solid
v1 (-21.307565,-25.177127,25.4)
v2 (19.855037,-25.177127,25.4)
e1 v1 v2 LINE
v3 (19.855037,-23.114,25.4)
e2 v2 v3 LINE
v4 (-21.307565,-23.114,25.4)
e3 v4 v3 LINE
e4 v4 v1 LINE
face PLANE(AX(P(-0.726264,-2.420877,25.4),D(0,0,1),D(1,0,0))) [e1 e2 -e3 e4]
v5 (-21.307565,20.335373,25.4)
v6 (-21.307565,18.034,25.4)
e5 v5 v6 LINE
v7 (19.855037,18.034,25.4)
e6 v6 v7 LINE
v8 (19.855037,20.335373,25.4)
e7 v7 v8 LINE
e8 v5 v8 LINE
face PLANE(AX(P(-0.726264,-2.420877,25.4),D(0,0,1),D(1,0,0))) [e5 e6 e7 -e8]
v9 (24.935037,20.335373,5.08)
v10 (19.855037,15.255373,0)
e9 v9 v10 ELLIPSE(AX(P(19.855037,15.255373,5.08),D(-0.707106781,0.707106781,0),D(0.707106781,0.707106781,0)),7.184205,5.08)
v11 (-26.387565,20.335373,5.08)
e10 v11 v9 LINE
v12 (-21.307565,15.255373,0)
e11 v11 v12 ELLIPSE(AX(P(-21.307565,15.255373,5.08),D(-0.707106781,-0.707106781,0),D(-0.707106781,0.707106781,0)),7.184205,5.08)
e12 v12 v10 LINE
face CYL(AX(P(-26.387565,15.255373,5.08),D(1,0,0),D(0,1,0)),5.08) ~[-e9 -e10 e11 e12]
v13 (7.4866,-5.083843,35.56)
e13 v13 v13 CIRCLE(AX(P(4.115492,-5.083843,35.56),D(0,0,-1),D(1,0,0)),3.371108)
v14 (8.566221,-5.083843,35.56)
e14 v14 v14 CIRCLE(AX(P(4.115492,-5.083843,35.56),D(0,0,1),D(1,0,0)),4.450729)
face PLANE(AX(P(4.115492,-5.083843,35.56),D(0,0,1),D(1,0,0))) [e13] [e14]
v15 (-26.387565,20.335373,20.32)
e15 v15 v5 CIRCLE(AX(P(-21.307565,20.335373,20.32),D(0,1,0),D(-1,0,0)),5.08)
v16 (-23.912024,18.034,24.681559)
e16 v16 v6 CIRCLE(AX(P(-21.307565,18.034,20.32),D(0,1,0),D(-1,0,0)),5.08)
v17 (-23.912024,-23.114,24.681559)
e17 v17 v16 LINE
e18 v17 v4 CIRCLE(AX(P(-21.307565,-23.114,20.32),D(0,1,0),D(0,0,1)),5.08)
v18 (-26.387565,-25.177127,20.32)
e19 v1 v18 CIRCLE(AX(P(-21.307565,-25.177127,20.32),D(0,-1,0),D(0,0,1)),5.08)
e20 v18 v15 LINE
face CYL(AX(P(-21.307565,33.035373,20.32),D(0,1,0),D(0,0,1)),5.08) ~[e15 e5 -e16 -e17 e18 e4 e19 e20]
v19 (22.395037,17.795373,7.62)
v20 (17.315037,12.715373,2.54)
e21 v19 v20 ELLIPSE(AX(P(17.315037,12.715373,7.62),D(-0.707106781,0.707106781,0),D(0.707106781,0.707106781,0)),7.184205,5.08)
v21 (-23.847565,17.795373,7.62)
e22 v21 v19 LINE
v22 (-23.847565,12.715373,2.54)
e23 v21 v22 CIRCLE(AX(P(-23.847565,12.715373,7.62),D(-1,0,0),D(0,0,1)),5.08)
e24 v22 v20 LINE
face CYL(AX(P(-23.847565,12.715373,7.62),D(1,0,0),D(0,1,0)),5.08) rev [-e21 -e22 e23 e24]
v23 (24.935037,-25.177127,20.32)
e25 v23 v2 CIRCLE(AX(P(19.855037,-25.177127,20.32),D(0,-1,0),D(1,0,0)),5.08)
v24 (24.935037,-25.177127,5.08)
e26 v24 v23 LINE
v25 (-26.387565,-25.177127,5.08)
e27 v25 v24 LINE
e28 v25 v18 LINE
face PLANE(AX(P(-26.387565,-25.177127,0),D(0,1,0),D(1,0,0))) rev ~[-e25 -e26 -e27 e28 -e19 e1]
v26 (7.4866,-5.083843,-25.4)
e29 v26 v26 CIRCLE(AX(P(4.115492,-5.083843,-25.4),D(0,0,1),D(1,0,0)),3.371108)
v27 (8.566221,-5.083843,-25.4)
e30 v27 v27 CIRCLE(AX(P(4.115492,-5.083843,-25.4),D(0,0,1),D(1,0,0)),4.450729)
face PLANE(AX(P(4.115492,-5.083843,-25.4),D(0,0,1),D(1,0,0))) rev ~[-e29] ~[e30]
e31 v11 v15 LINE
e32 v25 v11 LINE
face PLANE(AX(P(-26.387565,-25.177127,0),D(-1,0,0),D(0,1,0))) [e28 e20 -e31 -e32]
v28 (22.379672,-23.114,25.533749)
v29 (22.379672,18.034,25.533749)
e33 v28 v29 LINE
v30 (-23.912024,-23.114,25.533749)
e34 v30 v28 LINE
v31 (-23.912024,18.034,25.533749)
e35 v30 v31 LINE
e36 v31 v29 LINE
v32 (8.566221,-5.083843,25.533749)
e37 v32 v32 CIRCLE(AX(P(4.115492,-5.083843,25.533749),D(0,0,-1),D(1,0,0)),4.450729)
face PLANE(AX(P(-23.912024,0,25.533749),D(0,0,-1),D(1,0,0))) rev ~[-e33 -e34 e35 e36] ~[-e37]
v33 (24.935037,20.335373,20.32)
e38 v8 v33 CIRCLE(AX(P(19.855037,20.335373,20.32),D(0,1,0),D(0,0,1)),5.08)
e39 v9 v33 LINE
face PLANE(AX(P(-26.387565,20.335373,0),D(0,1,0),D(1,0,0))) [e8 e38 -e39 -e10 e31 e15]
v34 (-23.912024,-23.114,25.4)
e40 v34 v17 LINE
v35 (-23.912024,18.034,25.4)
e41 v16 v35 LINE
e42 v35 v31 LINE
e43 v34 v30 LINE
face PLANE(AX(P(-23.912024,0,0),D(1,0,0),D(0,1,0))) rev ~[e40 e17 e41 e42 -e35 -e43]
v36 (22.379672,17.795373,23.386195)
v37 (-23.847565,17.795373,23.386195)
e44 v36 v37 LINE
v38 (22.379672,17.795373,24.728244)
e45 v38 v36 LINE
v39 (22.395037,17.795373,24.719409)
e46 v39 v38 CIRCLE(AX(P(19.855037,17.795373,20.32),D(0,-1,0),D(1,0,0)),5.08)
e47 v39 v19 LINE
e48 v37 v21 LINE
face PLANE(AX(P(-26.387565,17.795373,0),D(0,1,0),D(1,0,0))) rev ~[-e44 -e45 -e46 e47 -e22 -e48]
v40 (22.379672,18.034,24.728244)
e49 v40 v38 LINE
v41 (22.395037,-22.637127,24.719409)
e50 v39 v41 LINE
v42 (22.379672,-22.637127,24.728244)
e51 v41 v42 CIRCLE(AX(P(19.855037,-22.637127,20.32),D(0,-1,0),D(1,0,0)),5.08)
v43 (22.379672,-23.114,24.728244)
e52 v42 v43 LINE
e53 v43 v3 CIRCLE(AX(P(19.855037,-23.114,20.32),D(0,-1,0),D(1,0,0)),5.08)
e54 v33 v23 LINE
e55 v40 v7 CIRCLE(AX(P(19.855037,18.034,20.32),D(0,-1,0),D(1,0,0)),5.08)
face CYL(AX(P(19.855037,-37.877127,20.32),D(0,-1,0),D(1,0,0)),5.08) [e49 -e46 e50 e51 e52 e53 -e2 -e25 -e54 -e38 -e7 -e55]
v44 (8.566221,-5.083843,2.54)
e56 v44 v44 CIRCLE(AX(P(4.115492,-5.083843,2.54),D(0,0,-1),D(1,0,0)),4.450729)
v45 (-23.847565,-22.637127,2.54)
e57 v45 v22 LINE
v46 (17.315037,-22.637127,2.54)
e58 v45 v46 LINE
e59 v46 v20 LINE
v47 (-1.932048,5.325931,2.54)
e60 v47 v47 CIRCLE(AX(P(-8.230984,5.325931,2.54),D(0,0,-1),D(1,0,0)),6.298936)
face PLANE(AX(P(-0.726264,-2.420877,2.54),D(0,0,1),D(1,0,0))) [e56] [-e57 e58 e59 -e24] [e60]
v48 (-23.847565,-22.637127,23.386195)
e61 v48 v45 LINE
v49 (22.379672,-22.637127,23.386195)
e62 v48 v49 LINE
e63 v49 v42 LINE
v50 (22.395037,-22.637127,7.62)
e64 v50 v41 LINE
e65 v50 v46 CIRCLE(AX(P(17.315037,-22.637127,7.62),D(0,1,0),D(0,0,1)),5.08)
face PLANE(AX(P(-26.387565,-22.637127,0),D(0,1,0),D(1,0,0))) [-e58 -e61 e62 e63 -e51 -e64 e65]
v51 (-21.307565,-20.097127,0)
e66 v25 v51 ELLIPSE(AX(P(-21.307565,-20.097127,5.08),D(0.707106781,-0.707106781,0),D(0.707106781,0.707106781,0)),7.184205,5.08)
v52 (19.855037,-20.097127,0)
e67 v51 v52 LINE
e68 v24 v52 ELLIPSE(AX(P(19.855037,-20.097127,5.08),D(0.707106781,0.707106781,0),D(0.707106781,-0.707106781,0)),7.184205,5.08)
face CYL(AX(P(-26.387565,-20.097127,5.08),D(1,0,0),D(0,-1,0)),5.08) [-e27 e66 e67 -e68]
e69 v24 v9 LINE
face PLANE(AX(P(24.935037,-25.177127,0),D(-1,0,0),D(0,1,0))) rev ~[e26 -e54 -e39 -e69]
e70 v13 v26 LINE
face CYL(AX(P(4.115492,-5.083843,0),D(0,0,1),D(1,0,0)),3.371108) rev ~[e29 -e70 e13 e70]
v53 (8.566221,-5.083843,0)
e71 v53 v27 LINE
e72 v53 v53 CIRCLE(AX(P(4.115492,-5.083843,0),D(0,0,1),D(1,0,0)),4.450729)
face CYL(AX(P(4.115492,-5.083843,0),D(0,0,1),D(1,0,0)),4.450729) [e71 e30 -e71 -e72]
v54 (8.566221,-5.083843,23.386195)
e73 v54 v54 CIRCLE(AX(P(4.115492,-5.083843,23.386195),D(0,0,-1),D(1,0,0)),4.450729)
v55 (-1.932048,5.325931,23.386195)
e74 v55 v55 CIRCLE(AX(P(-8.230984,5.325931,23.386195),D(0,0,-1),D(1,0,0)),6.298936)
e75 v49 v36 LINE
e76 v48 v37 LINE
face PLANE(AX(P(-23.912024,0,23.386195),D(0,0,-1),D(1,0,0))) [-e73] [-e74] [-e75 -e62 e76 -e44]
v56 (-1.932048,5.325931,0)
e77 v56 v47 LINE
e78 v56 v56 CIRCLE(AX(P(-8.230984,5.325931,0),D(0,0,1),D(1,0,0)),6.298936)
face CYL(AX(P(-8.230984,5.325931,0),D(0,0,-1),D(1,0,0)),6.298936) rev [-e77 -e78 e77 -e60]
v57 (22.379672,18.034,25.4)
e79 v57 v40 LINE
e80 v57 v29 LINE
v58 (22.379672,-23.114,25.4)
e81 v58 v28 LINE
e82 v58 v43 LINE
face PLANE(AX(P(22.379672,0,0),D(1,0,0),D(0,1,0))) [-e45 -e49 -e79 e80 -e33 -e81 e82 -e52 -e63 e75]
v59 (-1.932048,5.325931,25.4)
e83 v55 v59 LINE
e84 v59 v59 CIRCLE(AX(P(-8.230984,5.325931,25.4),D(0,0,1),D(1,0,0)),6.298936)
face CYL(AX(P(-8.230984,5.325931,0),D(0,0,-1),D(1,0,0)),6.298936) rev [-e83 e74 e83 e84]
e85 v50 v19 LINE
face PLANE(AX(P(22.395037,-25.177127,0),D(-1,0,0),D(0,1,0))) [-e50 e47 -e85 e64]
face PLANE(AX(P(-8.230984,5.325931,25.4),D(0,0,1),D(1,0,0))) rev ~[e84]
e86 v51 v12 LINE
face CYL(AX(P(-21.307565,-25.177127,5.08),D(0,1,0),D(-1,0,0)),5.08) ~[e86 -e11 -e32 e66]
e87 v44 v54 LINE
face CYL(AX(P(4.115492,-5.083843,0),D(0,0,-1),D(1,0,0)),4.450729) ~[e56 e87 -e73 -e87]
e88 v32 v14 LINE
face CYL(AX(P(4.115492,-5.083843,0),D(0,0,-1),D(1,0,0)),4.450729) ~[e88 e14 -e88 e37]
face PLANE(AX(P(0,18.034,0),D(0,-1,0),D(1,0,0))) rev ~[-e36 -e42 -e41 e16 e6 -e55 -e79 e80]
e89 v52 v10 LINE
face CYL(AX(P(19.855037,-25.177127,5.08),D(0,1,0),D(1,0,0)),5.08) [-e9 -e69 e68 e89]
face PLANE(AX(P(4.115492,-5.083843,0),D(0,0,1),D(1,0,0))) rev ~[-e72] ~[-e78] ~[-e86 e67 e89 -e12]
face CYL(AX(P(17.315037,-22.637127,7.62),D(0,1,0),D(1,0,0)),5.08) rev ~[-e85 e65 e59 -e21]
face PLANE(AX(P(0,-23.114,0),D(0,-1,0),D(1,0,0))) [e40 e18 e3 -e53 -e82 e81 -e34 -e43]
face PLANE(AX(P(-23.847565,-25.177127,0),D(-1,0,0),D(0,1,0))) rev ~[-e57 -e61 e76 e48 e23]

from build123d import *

# Parameters (mm, degrees)
F0_W           = 51.3226017356
F0_H           = 45.5124992877
F1_DEPTH       = 25.4
F2_T           = -2.54
F3_R           = 5.08
F4_W           = 46.2916959077
F4_H           = 2.1475534886
F5_DEPTH       = 23.114
F5_DEPTH_BACK  = 18.034
F6_R           = 6.2989363063
F7_DEPTH       = 25.4
F7_DEPTH_BACK  = 36.83
F8_R           = 4.4507292133
F9_DEPTH       = 35.56
F9_DEPTH_BACK  = 25.4
F10_R          = 3.3711078554
F11_DEPTH      = 27.686
F11_DEPTH_BACK = 52.2224
F12_T4_DEPTH   = 70.9124992877
F12_T10_DEPTH  = 70.9124992877
F12_T16_DEPTH  = 70.9124992877
F12_T23_DEPTH  = 70.9124992877
F12_T29_DEPTH  = 70.9124992877
F12_T35_DEPTH  = 70.9124992877
F12_T41_DEPTH  = 70.9124992877
F12_T47_DEPTH  = 70.9124992877
F12_T54_DEPTH  = 70.9124992877
F12_T60_DEPTH  = 70.9124992877


# Not quite as in the source:
# - a fillet or chamfer that OpenCascade refuses, or shapes differently, is made with other operations: its cross-section is extruded or revolved along the edge and cut away or added


with BuildPart() as f1:
    # F0 (on Top) → F1 (new body)
    with BuildSketch(Plane.XY):
        with Locations((-0.7262639701, -2.4208771065)):
            Rectangle(F0_W, F0_H)
    extrude(amount=F1_DEPTH)

    # F2
    f2_openings = [f1.faces().sort_by_distance(p)[0] for p in [
        (-0.726264, -2.420877, 25.4),
    ]]
    offset(amount=F2_T, openings=f2_openings)

    # F3
    f3_edges = [f1.edges().sort_by_distance(p)[0] for p in [
        (-0.726264, -25.177127, 0),
        (-26.387565, -2.420877, 0),
        (-0.726264, 17.795373, 2.54),
        (22.395037, -2.420877, 2.54),
        (-0.726264, 20.335373, 0),
        (24.935037, -2.420877, 0),
    ]]
    fillet(f3_edges, radius=F3_R)

    # F4 (on Front) → F5 (join, two sides)
    with BuildSketch(Plane.XZ) as f5_sk:
        with Locations((-0.7661757991, 24.4599720463)):
            Rectangle(F4_W, F4_H)
    extrude(amount=F5_DEPTH)
    extrude(f5_sk.sketch, amount=-F5_DEPTH_BACK)

    # F6 (on Top) → F7 (cut, two sides)
    with BuildSketch(Plane.XY) as f7_sk:
        with Locations((-8.230984211, 5.3259306587)):
            Circle(F6_R)
    extrude(amount=F7_DEPTH, mode=Mode.SUBTRACT)
    extrude(f7_sk.sketch, amount=-F7_DEPTH_BACK, mode=Mode.SUBTRACT)

    # F8 (on Top) → F9 (join, two sides)
    with BuildSketch(Plane.XY) as f9_sk:
        with Locations((4.1154921055, -5.0838431343)):
            Circle(F8_R)
    extrude(amount=F9_DEPTH)
    extrude(f9_sk.sketch, amount=-F9_DEPTH_BACK)

    # F10 (on Top) → F11 (cut, two sides)
    with BuildSketch(Plane.XY) as f11_sk:
        with Locations((4.1154921055, -5.0838431343)):
            Circle(F10_R)
    extrude(amount=-F11_DEPTH, mode=Mode.SUBTRACT)
    extrude(f11_sk.sketch, amount=F11_DEPTH_BACK, mode=Mode.SUBTRACT)

    # F12: fillet of radius 5.08 on 2 edges, made by hand


with BuildPart() as f12_tool2:
    # F12_s3 → F12_t4 (new body)
    with BuildSketch(Plane.XZ.offset(37.8771267503)):
        with BuildLine():
            ThreePointArc((24.9350368977, 20.32), (23.4471393461, 23.9121024484), (19.8550368977, 25.4))
            Line((19.8550368977, 25.4), (24.9350368977, 25.4))
            Line((24.9350368977, 25.4), (24.9350368977, 20.32))
        make_face()
    extrude(amount=-F12_T4_DEPTH)

    split(bisect_by=Plane.YZ.offset(22.3796721548), keep=Keep.TOP)

    split(bisect_by=Plane.XZ.offset(23.114), keep=Keep.TOP)


with BuildPart() as f1_1:
    add(f1.part)

    # F12_t1: cut F12_tool2
    add(f12_tool2.part, mode=Mode.SUBTRACT)


with BuildPart() as f12_tool8:
    # F12_s9 → F12_t10 (new body)
    with BuildSketch(Plane.XZ.offset(37.8771267503)):
        with BuildLine():
            ThreePointArc((24.9350368977, 20.32), (23.4471393461, 23.9121024484), (19.8550368977, 25.4))
            Line((19.8550368977, 25.4), (24.9350368977, 25.4))
            Line((24.9350368977, 25.4), (24.9350368977, 20.32))
        make_face()
    extrude(amount=-F12_T10_DEPTH)

    split(bisect_by=Plane.YZ.offset(22.3796721548), keep=Keep.BOTTOM)

    split(bisect_by=Plane.XZ.offset(23.114), keep=Keep.TOP)


with BuildPart() as f1_2:
    add(f1_1.part)

    # F12_t7: cut F12_tool8
    add(f12_tool8.part, mode=Mode.SUBTRACT)


with BuildPart() as f12_tool14:
    # F12_s15 → F12_t16 (new body)
    with BuildSketch(Plane.XZ.offset(37.8771267503)):
        with BuildLine():
            ThreePointArc((24.9350368977, 20.32), (23.4471393461, 23.9121024484), (19.8550368977, 25.4))
            Line((19.8550368977, 25.4), (24.9350368977, 25.4))
            Line((24.9350368977, 25.4), (24.9350368977, 20.32))
        make_face()
    extrude(amount=-F12_T16_DEPTH)

    split(bisect_by=Plane.YZ.offset(22.3796721548), keep=Keep.TOP)

    split(bisect_by=Plane.XZ.offset(-18.034), keep=Keep.TOP)

    split(bisect_by=Plane.XZ.offset(23.114), keep=Keep.BOTTOM)


with BuildPart() as f1_3:
    add(f1_2.part)

    # F12_t13: cut F12_tool14
    add(f12_tool14.part, mode=Mode.SUBTRACT)


with BuildPart() as f12_tool21:
    # F12_s22 → F12_t23 (new body)
    with BuildSketch(Plane.XZ.offset(37.8771267503)):
        with BuildLine():
            ThreePointArc((24.9350368977, 20.32), (23.4471393461, 23.9121024484), (19.8550368977, 25.4))
            Line((19.8550368977, 25.4), (24.9350368977, 25.4))
            Line((24.9350368977, 25.4), (24.9350368977, 20.32))
        make_face()
    extrude(amount=-F12_T23_DEPTH)

    split(bisect_by=Plane.YZ.offset(22.3796721548), keep=Keep.TOP)

    split(bisect_by=Plane.XZ.offset(-18.034), keep=Keep.BOTTOM)


with BuildPart() as f1_4:
    add(f1_3.part)

    # F12_t20: cut F12_tool21
    add(f12_tool21.part, mode=Mode.SUBTRACT)


with BuildPart() as f12_tool27:
    # F12_s28 → F12_t29 (new body)
    with BuildSketch(Plane.XZ.offset(37.8771267503)):
        with BuildLine():
            ThreePointArc((24.9350368977, 20.32), (23.4471393461, 23.9121024484), (19.8550368977, 25.4))
            Line((19.8550368977, 25.4), (24.9350368977, 25.4))
            Line((24.9350368977, 25.4), (24.9350368977, 20.32))
        make_face()
    extrude(amount=-F12_T29_DEPTH)

    split(bisect_by=Plane.YZ.offset(22.3796721548), keep=Keep.BOTTOM)

    split(bisect_by=Plane.XZ.offset(-18.034), keep=Keep.BOTTOM)


with BuildPart() as f1_5:
    add(f1_4.part)

    # F12_t26: cut F12_tool27
    add(f12_tool27.part, mode=Mode.SUBTRACT)


with BuildPart() as f12_tool33:
    # F12_s34 → F12_t35 (new body)
    with BuildSketch(Plane.XZ.offset(-33.0353725374)):
        with BuildLine():
            ThreePointArc((-21.3075648379, 25.4), (-24.8996672864, 23.9121024484), (-26.3875648379, 20.32))
            Line((-26.3875648379, 20.32), (-26.3875648379, 25.4))
            Line((-26.3875648379, 25.4), (-21.3075648379, 25.4))
        make_face()
    extrude(amount=F12_T35_DEPTH)

    split(bisect_by=Plane.XZ.offset(-18.034), keep=Keep.BOTTOM)

    split(bisect_by=Plane.YZ.offset(-23.9120237529), keep=Keep.TOP)


with BuildPart() as f1_6:
    add(f1_5.part)

    # F12_t32: cut F12_tool33
    add(f12_tool33.part, mode=Mode.SUBTRACT)


with BuildPart() as f12_tool39:
    # F12_s40 → F12_t41 (new body)
    with BuildSketch(Plane.XZ.offset(-33.0353725374)):
        with BuildLine():
            ThreePointArc((-21.3075648379, 25.4), (-24.8996672864, 23.9121024484), (-26.3875648379, 20.32))
            Line((-26.3875648379, 20.32), (-26.3875648379, 25.4))
            Line((-26.3875648379, 25.4), (-21.3075648379, 25.4))
        make_face()
    extrude(amount=F12_T41_DEPTH)

    split(bisect_by=Plane.XZ.offset(-18.034), keep=Keep.BOTTOM)

    split(bisect_by=Plane.YZ.offset(-23.9120237529), keep=Keep.BOTTOM)


with BuildPart() as f1_7:
    add(f1_6.part)

    # F12_t38: cut F12_tool39
    add(f12_tool39.part, mode=Mode.SUBTRACT)


with BuildPart() as f12_tool45:
    # F12_s46 → F12_t47 (new body)
    with BuildSketch(Plane.XZ.offset(-33.0353725374)):
        with BuildLine():
            ThreePointArc((-21.3075648379, 25.4), (-24.8996672864, 23.9121024484), (-26.3875648379, 20.32))
            Line((-26.3875648379, 20.32), (-26.3875648379, 25.4))
            Line((-26.3875648379, 25.4), (-21.3075648379, 25.4))
        make_face()
    extrude(amount=F12_T47_DEPTH)

    split(bisect_by=Plane.XZ.offset(-18.034), keep=Keep.TOP)

    split(bisect_by=Plane.YZ.offset(-23.9120237529), keep=Keep.BOTTOM)

    split(bisect_by=Plane.XZ.offset(23.114), keep=Keep.BOTTOM)


with BuildPart() as f1_8:
    add(f1_7.part)

    # F12_t44: cut F12_tool45
    add(f12_tool45.part, mode=Mode.SUBTRACT)


with BuildPart() as f12_tool52:
    # F12_s53 → F12_t54 (new body)
    with BuildSketch(Plane.XZ.offset(-33.0353725374)):
        with BuildLine():
            ThreePointArc((-21.3075648379, 25.4), (-24.8996672864, 23.9121024484), (-26.3875648379, 20.32))
            Line((-26.3875648379, 20.32), (-26.3875648379, 25.4))
            Line((-26.3875648379, 25.4), (-21.3075648379, 25.4))
        make_face()
    extrude(amount=F12_T54_DEPTH)

    split(bisect_by=Plane.YZ.offset(-23.9120237529), keep=Keep.TOP)

    split(bisect_by=Plane.XZ.offset(23.114), keep=Keep.TOP)


with BuildPart() as f1_9:
    add(f1_8.part)

    # F12_t51: cut F12_tool52
    add(f12_tool52.part, mode=Mode.SUBTRACT)


with BuildPart() as f12_tool58:
    # F12_s59 → F12_t60 (new body)
    with BuildSketch(Plane.XZ.offset(-33.0353725374)):
        with BuildLine():
            ThreePointArc((-21.3075648379, 25.4), (-24.8996672864, 23.9121024484), (-26.3875648379, 20.32))
            Line((-26.3875648379, 20.32), (-26.3875648379, 25.4))
            Line((-26.3875648379, 25.4), (-21.3075648379, 25.4))
        make_face()
    extrude(amount=F12_T60_DEPTH)

    split(bisect_by=Plane.YZ.offset(-23.9120237529), keep=Keep.BOTTOM)

    split(bisect_by=Plane.XZ.offset(23.114), keep=Keep.TOP)


with BuildPart() as f1_10:
    add(f1_9.part)

    # F12_t57: cut F12_tool58
    add(f12_tool58.part, mode=Mode.SUBTRACT)


solid = f1_10.part
